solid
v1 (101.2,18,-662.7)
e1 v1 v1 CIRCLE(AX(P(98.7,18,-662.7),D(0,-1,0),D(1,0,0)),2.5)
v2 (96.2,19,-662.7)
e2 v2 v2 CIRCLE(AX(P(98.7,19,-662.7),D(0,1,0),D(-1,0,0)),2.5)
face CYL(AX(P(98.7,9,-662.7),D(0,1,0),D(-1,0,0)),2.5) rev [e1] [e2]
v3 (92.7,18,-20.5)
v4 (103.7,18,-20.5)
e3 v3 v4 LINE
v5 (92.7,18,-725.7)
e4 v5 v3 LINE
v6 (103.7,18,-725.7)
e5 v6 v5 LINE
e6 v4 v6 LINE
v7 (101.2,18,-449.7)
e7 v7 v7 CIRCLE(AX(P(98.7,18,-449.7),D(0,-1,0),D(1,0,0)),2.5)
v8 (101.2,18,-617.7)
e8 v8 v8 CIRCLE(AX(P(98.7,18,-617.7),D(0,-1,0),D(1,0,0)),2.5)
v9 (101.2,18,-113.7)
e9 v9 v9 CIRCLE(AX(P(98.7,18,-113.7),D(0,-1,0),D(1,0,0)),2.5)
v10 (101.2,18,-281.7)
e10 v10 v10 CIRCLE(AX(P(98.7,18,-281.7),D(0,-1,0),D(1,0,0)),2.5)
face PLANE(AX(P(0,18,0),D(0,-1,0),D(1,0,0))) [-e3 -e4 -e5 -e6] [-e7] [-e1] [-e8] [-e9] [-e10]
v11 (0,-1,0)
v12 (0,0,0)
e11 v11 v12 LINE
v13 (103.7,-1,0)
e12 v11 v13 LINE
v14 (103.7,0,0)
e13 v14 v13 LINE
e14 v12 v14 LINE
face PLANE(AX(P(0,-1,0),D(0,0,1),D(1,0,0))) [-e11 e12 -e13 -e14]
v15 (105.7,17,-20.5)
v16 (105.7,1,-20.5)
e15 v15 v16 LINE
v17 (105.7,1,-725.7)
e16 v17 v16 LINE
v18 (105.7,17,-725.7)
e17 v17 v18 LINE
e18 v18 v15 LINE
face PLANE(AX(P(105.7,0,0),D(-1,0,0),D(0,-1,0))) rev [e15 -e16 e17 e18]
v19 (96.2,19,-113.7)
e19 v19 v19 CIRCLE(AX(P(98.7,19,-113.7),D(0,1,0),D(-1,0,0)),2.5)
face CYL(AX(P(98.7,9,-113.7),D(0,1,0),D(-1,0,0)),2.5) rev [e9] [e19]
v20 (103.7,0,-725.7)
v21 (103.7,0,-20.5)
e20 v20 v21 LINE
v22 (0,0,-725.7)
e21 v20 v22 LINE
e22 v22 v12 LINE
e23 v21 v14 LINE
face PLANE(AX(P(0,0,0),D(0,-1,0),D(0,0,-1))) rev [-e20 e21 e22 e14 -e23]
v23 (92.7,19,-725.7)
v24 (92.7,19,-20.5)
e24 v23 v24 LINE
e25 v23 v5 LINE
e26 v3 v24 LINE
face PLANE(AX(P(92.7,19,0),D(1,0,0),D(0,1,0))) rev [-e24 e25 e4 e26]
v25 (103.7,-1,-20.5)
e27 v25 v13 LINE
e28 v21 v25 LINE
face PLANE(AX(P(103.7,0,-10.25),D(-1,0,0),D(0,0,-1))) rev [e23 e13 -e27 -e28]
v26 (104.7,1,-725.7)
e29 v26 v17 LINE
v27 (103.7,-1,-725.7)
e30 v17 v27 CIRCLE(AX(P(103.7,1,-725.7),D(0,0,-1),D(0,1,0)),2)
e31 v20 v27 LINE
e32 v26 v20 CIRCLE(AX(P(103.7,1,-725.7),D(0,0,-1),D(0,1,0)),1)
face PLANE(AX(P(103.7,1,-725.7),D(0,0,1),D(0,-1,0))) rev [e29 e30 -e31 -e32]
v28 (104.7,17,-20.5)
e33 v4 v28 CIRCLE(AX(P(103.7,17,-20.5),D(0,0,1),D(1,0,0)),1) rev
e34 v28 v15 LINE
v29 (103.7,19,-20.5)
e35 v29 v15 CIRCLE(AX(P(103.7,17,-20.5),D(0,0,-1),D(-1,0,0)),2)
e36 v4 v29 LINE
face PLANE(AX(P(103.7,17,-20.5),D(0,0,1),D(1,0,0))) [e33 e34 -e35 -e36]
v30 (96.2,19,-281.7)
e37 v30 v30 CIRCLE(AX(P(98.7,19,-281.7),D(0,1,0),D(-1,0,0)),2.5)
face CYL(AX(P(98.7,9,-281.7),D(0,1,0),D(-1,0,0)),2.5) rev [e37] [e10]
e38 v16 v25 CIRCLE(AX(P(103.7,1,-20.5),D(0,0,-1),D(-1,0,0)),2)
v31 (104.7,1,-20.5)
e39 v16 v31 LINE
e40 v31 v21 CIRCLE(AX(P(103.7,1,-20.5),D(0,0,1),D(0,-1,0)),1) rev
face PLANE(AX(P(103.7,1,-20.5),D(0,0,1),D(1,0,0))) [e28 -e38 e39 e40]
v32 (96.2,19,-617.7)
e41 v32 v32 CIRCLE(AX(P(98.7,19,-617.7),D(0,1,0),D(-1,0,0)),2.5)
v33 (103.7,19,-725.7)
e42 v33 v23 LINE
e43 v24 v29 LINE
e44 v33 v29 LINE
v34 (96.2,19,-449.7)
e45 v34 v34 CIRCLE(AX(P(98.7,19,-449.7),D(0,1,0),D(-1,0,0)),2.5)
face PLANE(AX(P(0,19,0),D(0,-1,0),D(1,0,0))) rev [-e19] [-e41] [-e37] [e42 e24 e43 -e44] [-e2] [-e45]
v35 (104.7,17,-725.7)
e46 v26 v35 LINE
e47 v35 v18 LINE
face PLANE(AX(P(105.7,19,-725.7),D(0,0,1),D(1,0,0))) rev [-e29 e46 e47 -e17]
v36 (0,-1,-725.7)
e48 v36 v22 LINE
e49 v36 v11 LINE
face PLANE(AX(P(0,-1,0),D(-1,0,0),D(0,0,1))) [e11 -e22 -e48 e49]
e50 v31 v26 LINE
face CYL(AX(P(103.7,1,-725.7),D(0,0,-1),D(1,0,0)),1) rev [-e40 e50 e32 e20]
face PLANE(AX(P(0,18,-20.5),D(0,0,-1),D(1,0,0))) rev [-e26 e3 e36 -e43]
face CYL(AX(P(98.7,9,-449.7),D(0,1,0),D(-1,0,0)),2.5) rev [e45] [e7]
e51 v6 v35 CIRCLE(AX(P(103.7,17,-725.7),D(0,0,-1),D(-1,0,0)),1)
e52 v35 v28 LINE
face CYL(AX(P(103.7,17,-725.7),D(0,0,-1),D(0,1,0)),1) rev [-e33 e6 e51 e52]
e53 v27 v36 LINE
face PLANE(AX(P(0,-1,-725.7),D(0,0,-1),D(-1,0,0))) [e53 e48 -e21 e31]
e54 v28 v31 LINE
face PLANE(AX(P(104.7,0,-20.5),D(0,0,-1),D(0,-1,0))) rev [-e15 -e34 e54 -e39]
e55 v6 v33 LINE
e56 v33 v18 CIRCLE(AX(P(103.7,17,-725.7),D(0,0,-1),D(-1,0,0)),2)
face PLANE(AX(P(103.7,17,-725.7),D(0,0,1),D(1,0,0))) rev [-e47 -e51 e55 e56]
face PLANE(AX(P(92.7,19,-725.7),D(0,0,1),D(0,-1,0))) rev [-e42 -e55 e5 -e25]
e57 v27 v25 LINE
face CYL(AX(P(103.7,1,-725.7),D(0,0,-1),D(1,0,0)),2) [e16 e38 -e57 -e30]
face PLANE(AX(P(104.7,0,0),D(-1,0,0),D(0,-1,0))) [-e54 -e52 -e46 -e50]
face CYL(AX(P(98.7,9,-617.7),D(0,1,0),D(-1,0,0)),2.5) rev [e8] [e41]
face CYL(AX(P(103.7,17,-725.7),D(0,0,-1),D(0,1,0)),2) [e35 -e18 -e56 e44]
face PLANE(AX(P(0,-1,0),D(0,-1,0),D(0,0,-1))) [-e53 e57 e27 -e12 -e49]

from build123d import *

# Parameters (mm, degrees)
SKETCH1_W                    = 105.7
SKETCH1_H                    = 725.7
BASE_FLANGE1_DEPTH           = 1
EDGE_FLANGE1_STRIP_W         = 6
EDGE_FLANGE1_STRIP_H         = 1
EDGE_FLANGE1_STRIP_CUT_DEPTH = 725.7
EDGE_FLANGE1_DEPTH           = 725.7
EDGE_FLANGE2_STRIP_W         = 6
EDGE_FLANGE2_STRIP_H         = 1
EDGE_FLANGE2_STRIP_CUT_DEPTH = 725.7
EDGE_FLANGE2_DEPTH           = 725.7
SKETCH19_R                   = 2.5
CUT_EXTRUDE2_DEPTH           = 10
CUT_EXTRUDE3_START           = -20.5
CUT_EXTRUDE3_DEPTH           = 20.5


# Read off the part's stored shape, not the designer's step: Cut-Extrude3
# Sheet-metal steps are written as plain solids
with BuildPart() as part:
    # Sketch1 → Base-Flange1 (new body)
    with BuildSketch(Plane(origin=(0, 0, 0), x_dir=(1, 0, 0), z_dir=(0, 1, 0))):
        with Locations((52.85, 362.85)):
            Rectangle(SKETCH1_W, SKETCH1_H)
    extrude(amount=-BASE_FLANGE1_DEPTH)

    # Edge-Flange1 strip (across the edge) → Edge-Flange1 strip cut (cut)
    with BuildSketch(Plane(origin=(105.7, 0, 0), x_dir=(-1, 0, 0), z_dir=(0, 0, -1))):
        with Locations((-1, -0.5)):
            Rectangle(EDGE_FLANGE1_STRIP_W, EDGE_FLANGE1_STRIP_H)
    extrude(amount=EDGE_FLANGE1_STRIP_CUT_DEPTH, mode=Mode.SUBTRACT)

    # Edge-Flange1 section (across the edge) → Edge-Flange1 (add)
    with BuildSketch(Plane(origin=(105.7, 0, 0), x_dir=(-1, 0, 0), z_dir=(0, 0, -1))):
        with BuildLine():
            Line((0, 1), (0, 19))
            Line((0, 19), (1, 19))
            Line((1, 19), (1, 1))
            ThreePointArc((1, 1), (1.292893219, 0.292893219), (2, 0))
            Line((2, 0), (2, -1))
            ThreePointArc((2, -1), (0.585786438, -0.414213562), (0, 1))
        make_face()
    extrude(amount=EDGE_FLANGE1_DEPTH)

    # Edge-Flange2 strip (across the edge) → Edge-Flange2 strip cut (cut)
    with BuildSketch(Plane(origin=(104.7, 19, 0), x_dir=(0, -1, 0), z_dir=(0, 0, -1))):
        with Locations((-1, -0.5)):
            Rectangle(EDGE_FLANGE2_STRIP_W, EDGE_FLANGE2_STRIP_H)
    extrude(amount=EDGE_FLANGE2_STRIP_CUT_DEPTH, mode=Mode.SUBTRACT)

    # Edge-Flange2 section (across the edge) → Edge-Flange2 (add)
    with BuildSketch(Plane(origin=(104.7, 19, 0), x_dir=(0, -1, 0), z_dir=(0, 0, -1))):
        with BuildLine():
            Line((0, 1), (0, 12))
            Line((0, 12), (1, 12))
            Line((1, 12), (1, 1))
            ThreePointArc((1, 1), (1.292893219, 0.292893219), (2, 0))
            Line((2, 0), (2, -1))
            ThreePointArc((2, -1), (0.585786438, -0.414213562), (0, 1))
        make_face()
    extrude(amount=EDGE_FLANGE2_DEPTH)

    # Sketch19 → Cut-Extrude2 (cut)
    with BuildSketch(Plane(origin=(0, 19, 0), x_dir=(1, 0, 0), z_dir=(0, 1, 0))):
        with Locations(Location((98.7, 662.7, 0), (0, 0, 180))):
            Circle(SKETCH19_R)
        with Locations(Location((98.7, 617.7, 0), (0, 0, 180))):
            Circle(SKETCH19_R)
        with Locations(Location((98.7, 449.7, 0), (0, 0, 180))):
            Circle(SKETCH19_R)
        with Locations(Location((98.7, 281.7, 0), (0, 0, 180))):
            Circle(SKETCH19_R)
        with Locations(Location((98.7, 113.7, 0), (0, 0, 180))):
            Circle(SKETCH19_R)
        with Locations((98.7, -54.3)):
            Circle(SKETCH19_R)
    extrude(amount=-CUT_EXTRUDE2_DEPTH, mode=Mode.SUBTRACT)

    # Cut-Extrude3 outline → Cut-Extrude3 (cut)
    with BuildSketch(Plane.XY.offset(CUT_EXTRUDE3_START)):
        with BuildLine():
            ThreePointArc((104.7, 1), (104.407106781, 0.292893219), (103.7, 0))
            Line((103.7, 0), (103.7, -1))
            ThreePointArc((103.7, -1), (105.114213562, -0.414213562), (105.7, 1))
            Line((105.7, 1), (105.7, 17))
            ThreePointArc((105.7, 17), (105.114213562, 18.414213562), (103.7, 19))
            Line((103.7, 19), (92.7, 19))
            Line((92.7, 19), (92.7, 18))
            Line((92.7, 18), (103.7, 18))
            ThreePointArc((103.7, 18), (104.407106781, 17.707106781), (104.7, 17))
            Line((104.7, 17), (104.7, 1))
        make_face()
    extrude(amount=CUT_EXTRUDE3_DEPTH, mode=Mode.SUBTRACT)


solid = part.part
